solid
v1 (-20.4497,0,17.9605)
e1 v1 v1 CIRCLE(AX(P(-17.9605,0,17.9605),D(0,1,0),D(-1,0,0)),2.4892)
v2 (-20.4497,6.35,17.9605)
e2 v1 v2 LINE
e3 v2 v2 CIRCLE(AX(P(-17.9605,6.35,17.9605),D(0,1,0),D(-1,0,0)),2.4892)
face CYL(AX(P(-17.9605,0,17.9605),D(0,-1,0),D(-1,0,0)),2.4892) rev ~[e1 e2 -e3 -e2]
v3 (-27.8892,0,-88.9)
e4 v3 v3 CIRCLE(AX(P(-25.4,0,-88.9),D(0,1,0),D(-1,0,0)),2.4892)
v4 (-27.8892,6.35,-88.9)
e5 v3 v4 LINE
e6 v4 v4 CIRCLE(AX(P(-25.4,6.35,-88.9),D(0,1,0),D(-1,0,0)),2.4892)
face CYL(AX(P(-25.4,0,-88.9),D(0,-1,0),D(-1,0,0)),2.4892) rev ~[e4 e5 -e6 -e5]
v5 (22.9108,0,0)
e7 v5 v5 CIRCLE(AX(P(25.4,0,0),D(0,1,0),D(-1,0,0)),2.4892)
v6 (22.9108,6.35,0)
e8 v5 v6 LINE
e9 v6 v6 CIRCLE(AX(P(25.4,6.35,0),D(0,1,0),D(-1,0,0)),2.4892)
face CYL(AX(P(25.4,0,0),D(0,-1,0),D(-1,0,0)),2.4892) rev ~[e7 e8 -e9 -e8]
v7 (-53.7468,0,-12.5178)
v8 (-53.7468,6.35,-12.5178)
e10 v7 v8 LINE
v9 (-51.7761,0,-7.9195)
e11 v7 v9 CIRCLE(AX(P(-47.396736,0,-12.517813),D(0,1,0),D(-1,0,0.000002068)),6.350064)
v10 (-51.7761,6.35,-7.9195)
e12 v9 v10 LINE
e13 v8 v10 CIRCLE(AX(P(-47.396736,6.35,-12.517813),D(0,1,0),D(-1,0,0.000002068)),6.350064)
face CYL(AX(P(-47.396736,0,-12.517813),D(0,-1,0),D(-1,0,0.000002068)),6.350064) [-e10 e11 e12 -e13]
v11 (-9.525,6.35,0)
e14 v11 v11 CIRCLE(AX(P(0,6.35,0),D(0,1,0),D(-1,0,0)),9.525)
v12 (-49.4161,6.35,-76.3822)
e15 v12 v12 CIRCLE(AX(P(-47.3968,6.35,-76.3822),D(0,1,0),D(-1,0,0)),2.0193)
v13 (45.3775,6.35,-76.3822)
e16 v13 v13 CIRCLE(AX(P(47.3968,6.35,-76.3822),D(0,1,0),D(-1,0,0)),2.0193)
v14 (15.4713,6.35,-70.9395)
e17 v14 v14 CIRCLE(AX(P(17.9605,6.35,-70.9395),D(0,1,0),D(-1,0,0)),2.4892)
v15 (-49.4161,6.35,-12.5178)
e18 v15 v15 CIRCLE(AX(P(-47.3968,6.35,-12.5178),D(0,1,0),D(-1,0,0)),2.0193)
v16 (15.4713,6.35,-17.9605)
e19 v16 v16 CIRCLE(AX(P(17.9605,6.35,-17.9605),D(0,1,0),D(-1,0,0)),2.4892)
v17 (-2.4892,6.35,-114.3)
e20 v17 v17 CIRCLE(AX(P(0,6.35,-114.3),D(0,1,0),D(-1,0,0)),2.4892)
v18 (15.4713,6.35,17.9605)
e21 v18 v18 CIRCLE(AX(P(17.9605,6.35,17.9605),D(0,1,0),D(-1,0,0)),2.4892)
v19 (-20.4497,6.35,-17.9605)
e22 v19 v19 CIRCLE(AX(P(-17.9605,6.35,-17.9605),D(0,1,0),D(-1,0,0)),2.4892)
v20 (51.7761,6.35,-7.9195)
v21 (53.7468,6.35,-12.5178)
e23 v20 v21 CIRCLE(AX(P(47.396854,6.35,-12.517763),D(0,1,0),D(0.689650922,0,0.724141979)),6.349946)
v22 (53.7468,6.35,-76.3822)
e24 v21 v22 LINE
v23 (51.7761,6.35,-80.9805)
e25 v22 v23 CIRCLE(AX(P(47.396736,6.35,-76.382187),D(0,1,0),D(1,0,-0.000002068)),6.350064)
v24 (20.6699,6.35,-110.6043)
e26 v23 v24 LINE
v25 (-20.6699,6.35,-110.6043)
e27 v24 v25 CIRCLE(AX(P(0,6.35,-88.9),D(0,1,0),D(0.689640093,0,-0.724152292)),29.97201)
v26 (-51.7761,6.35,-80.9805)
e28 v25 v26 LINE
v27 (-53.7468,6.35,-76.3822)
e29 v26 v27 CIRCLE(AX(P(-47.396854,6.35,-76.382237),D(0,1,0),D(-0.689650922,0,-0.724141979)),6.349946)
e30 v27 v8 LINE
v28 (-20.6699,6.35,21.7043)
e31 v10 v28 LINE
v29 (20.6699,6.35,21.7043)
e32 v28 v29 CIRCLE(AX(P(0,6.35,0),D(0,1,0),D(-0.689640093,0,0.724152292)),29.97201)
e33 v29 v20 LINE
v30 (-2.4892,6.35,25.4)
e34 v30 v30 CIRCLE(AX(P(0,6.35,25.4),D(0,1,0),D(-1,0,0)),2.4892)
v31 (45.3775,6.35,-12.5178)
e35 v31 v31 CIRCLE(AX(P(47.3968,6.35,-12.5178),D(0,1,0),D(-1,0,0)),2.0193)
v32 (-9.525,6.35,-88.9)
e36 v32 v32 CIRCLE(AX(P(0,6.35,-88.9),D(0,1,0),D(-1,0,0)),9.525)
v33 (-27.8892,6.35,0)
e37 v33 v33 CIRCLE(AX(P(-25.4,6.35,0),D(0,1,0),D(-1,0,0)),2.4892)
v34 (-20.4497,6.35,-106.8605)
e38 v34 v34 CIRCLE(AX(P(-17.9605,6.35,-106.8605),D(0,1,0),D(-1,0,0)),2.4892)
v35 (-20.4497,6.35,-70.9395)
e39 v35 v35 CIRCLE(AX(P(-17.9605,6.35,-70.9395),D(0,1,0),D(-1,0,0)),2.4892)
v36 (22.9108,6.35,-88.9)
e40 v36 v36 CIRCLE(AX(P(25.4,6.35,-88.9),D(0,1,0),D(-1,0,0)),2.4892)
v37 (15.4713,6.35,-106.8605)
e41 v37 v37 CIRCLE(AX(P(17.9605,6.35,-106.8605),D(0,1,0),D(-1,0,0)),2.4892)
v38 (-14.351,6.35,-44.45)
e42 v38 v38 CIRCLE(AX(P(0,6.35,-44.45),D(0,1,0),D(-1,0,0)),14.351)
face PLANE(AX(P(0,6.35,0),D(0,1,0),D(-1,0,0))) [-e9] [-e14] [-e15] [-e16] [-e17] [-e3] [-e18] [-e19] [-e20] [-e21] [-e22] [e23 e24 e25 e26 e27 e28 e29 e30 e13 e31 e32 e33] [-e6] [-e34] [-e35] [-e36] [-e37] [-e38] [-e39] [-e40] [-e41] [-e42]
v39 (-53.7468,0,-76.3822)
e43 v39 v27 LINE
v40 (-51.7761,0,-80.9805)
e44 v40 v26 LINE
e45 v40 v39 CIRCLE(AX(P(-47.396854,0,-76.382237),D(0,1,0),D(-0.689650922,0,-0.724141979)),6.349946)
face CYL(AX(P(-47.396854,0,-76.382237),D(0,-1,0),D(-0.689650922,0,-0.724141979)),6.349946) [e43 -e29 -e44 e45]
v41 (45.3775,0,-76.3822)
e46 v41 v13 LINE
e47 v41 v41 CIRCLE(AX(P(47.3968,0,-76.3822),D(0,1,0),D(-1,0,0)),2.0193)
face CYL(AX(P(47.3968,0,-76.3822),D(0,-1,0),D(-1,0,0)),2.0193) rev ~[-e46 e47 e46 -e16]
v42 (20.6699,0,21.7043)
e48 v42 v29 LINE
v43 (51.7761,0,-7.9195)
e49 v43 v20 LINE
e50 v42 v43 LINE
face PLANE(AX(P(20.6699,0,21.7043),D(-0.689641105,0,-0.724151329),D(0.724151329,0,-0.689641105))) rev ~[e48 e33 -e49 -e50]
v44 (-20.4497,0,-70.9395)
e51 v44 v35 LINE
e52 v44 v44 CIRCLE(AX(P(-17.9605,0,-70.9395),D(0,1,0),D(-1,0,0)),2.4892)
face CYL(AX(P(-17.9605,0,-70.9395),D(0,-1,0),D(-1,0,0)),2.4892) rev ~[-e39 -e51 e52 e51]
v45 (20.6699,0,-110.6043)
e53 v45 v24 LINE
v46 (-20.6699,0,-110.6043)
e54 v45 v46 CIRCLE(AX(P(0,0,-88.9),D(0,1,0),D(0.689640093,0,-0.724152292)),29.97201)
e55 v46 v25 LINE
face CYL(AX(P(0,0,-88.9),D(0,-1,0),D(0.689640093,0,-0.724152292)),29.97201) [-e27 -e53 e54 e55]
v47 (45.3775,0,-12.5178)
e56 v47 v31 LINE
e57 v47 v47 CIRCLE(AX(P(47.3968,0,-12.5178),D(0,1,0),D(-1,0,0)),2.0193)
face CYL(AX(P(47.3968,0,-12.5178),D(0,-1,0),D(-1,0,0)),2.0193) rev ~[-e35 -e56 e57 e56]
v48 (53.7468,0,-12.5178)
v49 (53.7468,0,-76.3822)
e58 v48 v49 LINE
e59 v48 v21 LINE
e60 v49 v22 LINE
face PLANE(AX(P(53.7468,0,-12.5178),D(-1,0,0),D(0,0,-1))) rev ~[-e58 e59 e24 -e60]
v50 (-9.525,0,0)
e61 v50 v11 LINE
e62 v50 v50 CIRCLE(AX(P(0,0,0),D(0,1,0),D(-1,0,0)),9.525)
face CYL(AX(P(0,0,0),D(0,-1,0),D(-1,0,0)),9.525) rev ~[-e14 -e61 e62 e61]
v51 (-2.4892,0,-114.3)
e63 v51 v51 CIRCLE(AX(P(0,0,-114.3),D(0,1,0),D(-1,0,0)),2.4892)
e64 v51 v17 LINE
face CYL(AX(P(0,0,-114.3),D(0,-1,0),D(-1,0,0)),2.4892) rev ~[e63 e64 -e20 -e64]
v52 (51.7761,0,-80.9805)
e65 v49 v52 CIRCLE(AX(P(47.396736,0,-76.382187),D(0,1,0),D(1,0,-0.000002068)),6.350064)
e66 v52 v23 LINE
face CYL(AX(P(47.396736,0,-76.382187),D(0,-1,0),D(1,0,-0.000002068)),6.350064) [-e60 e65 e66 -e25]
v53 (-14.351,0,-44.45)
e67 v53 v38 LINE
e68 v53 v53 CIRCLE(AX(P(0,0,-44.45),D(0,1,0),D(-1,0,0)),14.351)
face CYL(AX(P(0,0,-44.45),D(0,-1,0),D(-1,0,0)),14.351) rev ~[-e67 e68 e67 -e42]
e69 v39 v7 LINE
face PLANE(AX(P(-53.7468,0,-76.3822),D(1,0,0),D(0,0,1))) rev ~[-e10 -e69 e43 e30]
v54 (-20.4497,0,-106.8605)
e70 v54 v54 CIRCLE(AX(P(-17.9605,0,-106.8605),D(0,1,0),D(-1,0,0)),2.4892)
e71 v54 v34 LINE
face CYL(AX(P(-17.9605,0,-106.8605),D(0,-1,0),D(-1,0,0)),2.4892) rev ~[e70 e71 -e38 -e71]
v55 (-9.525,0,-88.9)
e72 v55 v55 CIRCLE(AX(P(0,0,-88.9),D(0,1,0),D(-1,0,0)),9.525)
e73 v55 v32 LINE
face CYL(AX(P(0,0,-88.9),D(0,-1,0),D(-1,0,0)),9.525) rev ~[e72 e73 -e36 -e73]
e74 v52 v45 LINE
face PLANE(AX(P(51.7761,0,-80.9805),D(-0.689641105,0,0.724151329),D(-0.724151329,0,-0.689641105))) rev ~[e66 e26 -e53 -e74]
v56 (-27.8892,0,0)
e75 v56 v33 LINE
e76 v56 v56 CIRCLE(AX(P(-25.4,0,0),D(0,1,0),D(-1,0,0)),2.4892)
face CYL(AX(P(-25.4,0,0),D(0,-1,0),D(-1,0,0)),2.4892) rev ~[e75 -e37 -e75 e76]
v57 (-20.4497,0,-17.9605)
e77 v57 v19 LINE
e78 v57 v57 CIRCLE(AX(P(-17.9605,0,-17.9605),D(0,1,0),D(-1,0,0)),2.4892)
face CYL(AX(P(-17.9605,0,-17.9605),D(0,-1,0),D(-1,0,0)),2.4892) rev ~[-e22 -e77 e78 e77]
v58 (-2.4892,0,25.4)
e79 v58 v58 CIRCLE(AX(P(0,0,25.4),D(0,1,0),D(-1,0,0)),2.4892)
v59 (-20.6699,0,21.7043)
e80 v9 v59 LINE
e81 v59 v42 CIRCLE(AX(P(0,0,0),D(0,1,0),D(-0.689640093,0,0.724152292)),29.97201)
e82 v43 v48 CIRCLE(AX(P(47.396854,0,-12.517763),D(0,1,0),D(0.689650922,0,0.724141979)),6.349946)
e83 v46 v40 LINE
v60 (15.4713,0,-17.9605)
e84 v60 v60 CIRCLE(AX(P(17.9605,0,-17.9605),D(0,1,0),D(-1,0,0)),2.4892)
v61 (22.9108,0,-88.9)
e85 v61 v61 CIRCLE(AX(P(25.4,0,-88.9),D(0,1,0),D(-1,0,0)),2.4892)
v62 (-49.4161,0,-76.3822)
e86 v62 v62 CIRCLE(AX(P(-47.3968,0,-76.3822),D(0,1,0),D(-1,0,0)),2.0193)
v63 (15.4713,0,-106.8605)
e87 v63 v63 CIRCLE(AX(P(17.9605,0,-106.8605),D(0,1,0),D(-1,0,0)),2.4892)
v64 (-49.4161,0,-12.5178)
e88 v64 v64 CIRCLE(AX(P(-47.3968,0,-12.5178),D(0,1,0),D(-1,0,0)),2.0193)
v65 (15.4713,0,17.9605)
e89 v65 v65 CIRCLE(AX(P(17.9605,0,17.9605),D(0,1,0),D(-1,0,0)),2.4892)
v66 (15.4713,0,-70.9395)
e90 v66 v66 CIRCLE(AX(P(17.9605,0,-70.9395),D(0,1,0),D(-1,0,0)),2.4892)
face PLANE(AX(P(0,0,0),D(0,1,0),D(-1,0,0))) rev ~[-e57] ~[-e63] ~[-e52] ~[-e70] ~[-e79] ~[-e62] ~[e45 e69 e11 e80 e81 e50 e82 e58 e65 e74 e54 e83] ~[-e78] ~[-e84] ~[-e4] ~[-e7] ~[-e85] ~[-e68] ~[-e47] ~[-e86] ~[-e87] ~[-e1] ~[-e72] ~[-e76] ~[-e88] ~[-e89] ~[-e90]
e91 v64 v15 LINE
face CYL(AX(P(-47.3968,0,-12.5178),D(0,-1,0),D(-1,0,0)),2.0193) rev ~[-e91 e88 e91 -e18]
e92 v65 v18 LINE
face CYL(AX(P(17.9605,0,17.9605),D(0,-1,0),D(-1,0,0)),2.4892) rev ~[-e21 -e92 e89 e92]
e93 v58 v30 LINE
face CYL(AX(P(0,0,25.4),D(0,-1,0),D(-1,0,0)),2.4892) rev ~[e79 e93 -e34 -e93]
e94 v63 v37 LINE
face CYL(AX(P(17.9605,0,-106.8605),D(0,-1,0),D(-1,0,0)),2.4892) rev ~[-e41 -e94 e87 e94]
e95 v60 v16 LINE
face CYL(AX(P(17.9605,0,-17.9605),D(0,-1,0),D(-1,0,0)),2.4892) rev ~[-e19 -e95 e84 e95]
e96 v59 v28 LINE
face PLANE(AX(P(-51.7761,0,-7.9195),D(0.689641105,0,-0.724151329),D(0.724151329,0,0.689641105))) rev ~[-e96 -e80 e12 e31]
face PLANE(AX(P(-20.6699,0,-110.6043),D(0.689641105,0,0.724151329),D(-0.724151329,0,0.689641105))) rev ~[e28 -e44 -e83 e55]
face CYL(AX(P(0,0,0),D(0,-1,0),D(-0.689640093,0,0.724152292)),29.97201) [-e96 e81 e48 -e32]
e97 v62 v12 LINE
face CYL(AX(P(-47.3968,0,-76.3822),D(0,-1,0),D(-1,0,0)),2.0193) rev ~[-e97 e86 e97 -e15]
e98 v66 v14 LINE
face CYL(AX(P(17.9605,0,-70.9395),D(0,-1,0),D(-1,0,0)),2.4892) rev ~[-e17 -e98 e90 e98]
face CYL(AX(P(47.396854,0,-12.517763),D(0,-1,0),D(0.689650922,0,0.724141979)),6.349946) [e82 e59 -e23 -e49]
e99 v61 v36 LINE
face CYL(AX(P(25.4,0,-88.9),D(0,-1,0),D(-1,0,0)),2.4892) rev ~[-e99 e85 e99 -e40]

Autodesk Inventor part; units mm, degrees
ref_plane "YZ Plane" through (0, 0, 0) normal (1, 0, 0) x (0, 1, 0)
ref_plane "XZ Plane" through (0, 0, 0) normal (0, 1, 0) x (-1, 0, 0)
ref_plane "XY Plane" through (0, 0, 0) normal (0, 0, 1) x (1, 0, 0)
sketch "Sketch1" plane through (0, 0, 0) normal (0, 1, 0) x (-1, 0, 0)
  point P0 (0, 0)
sketch "Sketch2" plane through (0, 0, 0) normal (0, 1, 0) x (-1, 0, 0)
  circle A0 centre (0, 0) radius 6.35 construction
  circle A1 centre (0, -44.45) radius 38.1 construction
  circle A2 centre (0, 0) radius 25.4 construction
  circle A3 centre (17.9605, -17.9605) radius 2.4892
  circle A4 centre (25.4, 0) radius 2.4892
  circle A5 centre (17.9605, 17.9605) radius 2.4892
  circle A6 centre (0, 25.4) radius 2.4892
  circle A7 centre (-17.9605, 17.9605) radius 2.4892
  circle A8 centre (-25.4, 0) radius 2.4892
  circle A9 centre (-17.9605, -17.9605) radius 2.4892
  circle A10 centre (0, -25.4) radius 2.4892 construction
  circle A11 centre (0, -88.9) radius 25.4 construction
  circle A12 centre (0, -88.9) radius 6.35 construction
  circle A13 centre (-17.9605, -70.9395) radius 2.4892
  circle A14 centre (-25.4, -88.9) radius 2.4892
  circle A15 centre (-17.9605, -106.8605) radius 2.4892
  circle A16 centre (0, -114.3) radius 2.4892
  circle A17 centre (17.9605, -106.8605) radius 2.4892
  circle A18 centre (25.4, -88.9) radius 2.4892
  circle A19 centre (17.9605, -70.9395) radius 2.4892
  circle A20 centre (0, -63.5) radius 2.4892 construction
  circle A21 centre (0, 0) radius 9.525
  circle A22 centre (0, -88.9) radius 9.525
  circle A23 centre (47.3968, -12.5178) radius 6.35 construction
  circle A24 centre (47.3968, -76.3822) radius 6.35 construction
  circle A25 centre (-47.3968, -76.3822) radius 6.35 construction
  circle A26 centre (0, 0) radius 29.972 construction
  circle A27 centre (0, -88.9) radius 29.972 construction
  circle A28 centre (-47.3968, -12.5178) radius 6.35 construction
  circle A29 centre (47.3968, -12.5178) radius 2.0193
  circle A30 centre (47.3968, -76.3822) radius 2.0193
  circle A31 centre (-47.3968, -12.5178) radius 2.0193
  circle A32 centre (-47.3968, -76.3822) radius 2.0193
  line L0 (42.1305, -72.8341) -> (31.5979, -65.7381) construction
  line L1 (41.2573, -78.0036) -> (28.9784, -81.2466) construction
  line L2 (-41.2573, -78.0036) -> (-28.9784, -81.2466) construction
  line L3 (-42.1305, -72.8341) -> (-31.5979, -65.7381) construction
  line L4 (-41.2573, -10.8964) -> (-28.9784, -7.6534) construction
  line L5 (-42.1305, -16.0659) -> (-31.5979, -23.1619) construction
  line L6 (41.2573, -10.8964) -> (28.9784, -7.6534) construction
  line L7 (42.1305, -16.0659) -> (31.5979, -23.1619) construction
  line L8 (-20.6699, 21.7043) -> (-51.7761, -7.9195)
  line L9 (-53.7468, -12.5178) -> (-53.7468, -76.3822)
  line L10 (-51.7761, -80.9805) -> (-20.6699, -110.6043)
  line L11 (20.6699, -110.6043) -> (51.7761, -80.9805)
  line L12 (53.7468, -76.3822) -> (53.7468, -12.5178)
  line L13 (51.7761, -7.9195) -> (20.6699, 21.7043)
  arc A33 (20.6699, 21.7043) -> (-20.6699, 21.7043) centre (0, 0) ccw
  arc A34 (-51.7761, -7.9195) -> (-53.7468, -12.5178) centre (-47.3968, -12.5178) ccw
  arc A35 (-53.7468, -76.3822) -> (-51.7761, -80.9805) centre (-47.3968, -76.3822) ccw
  arc A36 (-20.6699, -110.6043) -> (20.6699, -110.6043) centre (0, -88.9) ccw
  arc A37 (51.7761, -80.9805) -> (53.7468, -76.3822) centre (47.3968, -76.3822) ccw
  arc A38 (53.7468, -12.5178) -> (51.7761, -7.9195) centre (47.3968, -12.5178) ccw
  circle A39 centre (0, -44.45) radius 14.351
  dimension "d2" = 50.8
  dimension "d0" = 12.7
  dimension "d1" = 76.2
  dimension "d3" = 4.9784
  dimension "d6" = 360
  dimension "d8" = 4.9784
  dimension "d11" = 360
  dimension "d13" = 19.05
  dimension "d14" = 19.05
  dimension "d15" = 59.944
  dimension "d16" = 59.944
  dimension "d17" = 12.7
  dimension "d18" = 4.0386
  dimension "d24" = 12.7
  dimension "d25" = 28.702
extrude "Extrusion1" add sketch "Sketch2" along normal blind 6.35
properties part number "Bottom Plate"
